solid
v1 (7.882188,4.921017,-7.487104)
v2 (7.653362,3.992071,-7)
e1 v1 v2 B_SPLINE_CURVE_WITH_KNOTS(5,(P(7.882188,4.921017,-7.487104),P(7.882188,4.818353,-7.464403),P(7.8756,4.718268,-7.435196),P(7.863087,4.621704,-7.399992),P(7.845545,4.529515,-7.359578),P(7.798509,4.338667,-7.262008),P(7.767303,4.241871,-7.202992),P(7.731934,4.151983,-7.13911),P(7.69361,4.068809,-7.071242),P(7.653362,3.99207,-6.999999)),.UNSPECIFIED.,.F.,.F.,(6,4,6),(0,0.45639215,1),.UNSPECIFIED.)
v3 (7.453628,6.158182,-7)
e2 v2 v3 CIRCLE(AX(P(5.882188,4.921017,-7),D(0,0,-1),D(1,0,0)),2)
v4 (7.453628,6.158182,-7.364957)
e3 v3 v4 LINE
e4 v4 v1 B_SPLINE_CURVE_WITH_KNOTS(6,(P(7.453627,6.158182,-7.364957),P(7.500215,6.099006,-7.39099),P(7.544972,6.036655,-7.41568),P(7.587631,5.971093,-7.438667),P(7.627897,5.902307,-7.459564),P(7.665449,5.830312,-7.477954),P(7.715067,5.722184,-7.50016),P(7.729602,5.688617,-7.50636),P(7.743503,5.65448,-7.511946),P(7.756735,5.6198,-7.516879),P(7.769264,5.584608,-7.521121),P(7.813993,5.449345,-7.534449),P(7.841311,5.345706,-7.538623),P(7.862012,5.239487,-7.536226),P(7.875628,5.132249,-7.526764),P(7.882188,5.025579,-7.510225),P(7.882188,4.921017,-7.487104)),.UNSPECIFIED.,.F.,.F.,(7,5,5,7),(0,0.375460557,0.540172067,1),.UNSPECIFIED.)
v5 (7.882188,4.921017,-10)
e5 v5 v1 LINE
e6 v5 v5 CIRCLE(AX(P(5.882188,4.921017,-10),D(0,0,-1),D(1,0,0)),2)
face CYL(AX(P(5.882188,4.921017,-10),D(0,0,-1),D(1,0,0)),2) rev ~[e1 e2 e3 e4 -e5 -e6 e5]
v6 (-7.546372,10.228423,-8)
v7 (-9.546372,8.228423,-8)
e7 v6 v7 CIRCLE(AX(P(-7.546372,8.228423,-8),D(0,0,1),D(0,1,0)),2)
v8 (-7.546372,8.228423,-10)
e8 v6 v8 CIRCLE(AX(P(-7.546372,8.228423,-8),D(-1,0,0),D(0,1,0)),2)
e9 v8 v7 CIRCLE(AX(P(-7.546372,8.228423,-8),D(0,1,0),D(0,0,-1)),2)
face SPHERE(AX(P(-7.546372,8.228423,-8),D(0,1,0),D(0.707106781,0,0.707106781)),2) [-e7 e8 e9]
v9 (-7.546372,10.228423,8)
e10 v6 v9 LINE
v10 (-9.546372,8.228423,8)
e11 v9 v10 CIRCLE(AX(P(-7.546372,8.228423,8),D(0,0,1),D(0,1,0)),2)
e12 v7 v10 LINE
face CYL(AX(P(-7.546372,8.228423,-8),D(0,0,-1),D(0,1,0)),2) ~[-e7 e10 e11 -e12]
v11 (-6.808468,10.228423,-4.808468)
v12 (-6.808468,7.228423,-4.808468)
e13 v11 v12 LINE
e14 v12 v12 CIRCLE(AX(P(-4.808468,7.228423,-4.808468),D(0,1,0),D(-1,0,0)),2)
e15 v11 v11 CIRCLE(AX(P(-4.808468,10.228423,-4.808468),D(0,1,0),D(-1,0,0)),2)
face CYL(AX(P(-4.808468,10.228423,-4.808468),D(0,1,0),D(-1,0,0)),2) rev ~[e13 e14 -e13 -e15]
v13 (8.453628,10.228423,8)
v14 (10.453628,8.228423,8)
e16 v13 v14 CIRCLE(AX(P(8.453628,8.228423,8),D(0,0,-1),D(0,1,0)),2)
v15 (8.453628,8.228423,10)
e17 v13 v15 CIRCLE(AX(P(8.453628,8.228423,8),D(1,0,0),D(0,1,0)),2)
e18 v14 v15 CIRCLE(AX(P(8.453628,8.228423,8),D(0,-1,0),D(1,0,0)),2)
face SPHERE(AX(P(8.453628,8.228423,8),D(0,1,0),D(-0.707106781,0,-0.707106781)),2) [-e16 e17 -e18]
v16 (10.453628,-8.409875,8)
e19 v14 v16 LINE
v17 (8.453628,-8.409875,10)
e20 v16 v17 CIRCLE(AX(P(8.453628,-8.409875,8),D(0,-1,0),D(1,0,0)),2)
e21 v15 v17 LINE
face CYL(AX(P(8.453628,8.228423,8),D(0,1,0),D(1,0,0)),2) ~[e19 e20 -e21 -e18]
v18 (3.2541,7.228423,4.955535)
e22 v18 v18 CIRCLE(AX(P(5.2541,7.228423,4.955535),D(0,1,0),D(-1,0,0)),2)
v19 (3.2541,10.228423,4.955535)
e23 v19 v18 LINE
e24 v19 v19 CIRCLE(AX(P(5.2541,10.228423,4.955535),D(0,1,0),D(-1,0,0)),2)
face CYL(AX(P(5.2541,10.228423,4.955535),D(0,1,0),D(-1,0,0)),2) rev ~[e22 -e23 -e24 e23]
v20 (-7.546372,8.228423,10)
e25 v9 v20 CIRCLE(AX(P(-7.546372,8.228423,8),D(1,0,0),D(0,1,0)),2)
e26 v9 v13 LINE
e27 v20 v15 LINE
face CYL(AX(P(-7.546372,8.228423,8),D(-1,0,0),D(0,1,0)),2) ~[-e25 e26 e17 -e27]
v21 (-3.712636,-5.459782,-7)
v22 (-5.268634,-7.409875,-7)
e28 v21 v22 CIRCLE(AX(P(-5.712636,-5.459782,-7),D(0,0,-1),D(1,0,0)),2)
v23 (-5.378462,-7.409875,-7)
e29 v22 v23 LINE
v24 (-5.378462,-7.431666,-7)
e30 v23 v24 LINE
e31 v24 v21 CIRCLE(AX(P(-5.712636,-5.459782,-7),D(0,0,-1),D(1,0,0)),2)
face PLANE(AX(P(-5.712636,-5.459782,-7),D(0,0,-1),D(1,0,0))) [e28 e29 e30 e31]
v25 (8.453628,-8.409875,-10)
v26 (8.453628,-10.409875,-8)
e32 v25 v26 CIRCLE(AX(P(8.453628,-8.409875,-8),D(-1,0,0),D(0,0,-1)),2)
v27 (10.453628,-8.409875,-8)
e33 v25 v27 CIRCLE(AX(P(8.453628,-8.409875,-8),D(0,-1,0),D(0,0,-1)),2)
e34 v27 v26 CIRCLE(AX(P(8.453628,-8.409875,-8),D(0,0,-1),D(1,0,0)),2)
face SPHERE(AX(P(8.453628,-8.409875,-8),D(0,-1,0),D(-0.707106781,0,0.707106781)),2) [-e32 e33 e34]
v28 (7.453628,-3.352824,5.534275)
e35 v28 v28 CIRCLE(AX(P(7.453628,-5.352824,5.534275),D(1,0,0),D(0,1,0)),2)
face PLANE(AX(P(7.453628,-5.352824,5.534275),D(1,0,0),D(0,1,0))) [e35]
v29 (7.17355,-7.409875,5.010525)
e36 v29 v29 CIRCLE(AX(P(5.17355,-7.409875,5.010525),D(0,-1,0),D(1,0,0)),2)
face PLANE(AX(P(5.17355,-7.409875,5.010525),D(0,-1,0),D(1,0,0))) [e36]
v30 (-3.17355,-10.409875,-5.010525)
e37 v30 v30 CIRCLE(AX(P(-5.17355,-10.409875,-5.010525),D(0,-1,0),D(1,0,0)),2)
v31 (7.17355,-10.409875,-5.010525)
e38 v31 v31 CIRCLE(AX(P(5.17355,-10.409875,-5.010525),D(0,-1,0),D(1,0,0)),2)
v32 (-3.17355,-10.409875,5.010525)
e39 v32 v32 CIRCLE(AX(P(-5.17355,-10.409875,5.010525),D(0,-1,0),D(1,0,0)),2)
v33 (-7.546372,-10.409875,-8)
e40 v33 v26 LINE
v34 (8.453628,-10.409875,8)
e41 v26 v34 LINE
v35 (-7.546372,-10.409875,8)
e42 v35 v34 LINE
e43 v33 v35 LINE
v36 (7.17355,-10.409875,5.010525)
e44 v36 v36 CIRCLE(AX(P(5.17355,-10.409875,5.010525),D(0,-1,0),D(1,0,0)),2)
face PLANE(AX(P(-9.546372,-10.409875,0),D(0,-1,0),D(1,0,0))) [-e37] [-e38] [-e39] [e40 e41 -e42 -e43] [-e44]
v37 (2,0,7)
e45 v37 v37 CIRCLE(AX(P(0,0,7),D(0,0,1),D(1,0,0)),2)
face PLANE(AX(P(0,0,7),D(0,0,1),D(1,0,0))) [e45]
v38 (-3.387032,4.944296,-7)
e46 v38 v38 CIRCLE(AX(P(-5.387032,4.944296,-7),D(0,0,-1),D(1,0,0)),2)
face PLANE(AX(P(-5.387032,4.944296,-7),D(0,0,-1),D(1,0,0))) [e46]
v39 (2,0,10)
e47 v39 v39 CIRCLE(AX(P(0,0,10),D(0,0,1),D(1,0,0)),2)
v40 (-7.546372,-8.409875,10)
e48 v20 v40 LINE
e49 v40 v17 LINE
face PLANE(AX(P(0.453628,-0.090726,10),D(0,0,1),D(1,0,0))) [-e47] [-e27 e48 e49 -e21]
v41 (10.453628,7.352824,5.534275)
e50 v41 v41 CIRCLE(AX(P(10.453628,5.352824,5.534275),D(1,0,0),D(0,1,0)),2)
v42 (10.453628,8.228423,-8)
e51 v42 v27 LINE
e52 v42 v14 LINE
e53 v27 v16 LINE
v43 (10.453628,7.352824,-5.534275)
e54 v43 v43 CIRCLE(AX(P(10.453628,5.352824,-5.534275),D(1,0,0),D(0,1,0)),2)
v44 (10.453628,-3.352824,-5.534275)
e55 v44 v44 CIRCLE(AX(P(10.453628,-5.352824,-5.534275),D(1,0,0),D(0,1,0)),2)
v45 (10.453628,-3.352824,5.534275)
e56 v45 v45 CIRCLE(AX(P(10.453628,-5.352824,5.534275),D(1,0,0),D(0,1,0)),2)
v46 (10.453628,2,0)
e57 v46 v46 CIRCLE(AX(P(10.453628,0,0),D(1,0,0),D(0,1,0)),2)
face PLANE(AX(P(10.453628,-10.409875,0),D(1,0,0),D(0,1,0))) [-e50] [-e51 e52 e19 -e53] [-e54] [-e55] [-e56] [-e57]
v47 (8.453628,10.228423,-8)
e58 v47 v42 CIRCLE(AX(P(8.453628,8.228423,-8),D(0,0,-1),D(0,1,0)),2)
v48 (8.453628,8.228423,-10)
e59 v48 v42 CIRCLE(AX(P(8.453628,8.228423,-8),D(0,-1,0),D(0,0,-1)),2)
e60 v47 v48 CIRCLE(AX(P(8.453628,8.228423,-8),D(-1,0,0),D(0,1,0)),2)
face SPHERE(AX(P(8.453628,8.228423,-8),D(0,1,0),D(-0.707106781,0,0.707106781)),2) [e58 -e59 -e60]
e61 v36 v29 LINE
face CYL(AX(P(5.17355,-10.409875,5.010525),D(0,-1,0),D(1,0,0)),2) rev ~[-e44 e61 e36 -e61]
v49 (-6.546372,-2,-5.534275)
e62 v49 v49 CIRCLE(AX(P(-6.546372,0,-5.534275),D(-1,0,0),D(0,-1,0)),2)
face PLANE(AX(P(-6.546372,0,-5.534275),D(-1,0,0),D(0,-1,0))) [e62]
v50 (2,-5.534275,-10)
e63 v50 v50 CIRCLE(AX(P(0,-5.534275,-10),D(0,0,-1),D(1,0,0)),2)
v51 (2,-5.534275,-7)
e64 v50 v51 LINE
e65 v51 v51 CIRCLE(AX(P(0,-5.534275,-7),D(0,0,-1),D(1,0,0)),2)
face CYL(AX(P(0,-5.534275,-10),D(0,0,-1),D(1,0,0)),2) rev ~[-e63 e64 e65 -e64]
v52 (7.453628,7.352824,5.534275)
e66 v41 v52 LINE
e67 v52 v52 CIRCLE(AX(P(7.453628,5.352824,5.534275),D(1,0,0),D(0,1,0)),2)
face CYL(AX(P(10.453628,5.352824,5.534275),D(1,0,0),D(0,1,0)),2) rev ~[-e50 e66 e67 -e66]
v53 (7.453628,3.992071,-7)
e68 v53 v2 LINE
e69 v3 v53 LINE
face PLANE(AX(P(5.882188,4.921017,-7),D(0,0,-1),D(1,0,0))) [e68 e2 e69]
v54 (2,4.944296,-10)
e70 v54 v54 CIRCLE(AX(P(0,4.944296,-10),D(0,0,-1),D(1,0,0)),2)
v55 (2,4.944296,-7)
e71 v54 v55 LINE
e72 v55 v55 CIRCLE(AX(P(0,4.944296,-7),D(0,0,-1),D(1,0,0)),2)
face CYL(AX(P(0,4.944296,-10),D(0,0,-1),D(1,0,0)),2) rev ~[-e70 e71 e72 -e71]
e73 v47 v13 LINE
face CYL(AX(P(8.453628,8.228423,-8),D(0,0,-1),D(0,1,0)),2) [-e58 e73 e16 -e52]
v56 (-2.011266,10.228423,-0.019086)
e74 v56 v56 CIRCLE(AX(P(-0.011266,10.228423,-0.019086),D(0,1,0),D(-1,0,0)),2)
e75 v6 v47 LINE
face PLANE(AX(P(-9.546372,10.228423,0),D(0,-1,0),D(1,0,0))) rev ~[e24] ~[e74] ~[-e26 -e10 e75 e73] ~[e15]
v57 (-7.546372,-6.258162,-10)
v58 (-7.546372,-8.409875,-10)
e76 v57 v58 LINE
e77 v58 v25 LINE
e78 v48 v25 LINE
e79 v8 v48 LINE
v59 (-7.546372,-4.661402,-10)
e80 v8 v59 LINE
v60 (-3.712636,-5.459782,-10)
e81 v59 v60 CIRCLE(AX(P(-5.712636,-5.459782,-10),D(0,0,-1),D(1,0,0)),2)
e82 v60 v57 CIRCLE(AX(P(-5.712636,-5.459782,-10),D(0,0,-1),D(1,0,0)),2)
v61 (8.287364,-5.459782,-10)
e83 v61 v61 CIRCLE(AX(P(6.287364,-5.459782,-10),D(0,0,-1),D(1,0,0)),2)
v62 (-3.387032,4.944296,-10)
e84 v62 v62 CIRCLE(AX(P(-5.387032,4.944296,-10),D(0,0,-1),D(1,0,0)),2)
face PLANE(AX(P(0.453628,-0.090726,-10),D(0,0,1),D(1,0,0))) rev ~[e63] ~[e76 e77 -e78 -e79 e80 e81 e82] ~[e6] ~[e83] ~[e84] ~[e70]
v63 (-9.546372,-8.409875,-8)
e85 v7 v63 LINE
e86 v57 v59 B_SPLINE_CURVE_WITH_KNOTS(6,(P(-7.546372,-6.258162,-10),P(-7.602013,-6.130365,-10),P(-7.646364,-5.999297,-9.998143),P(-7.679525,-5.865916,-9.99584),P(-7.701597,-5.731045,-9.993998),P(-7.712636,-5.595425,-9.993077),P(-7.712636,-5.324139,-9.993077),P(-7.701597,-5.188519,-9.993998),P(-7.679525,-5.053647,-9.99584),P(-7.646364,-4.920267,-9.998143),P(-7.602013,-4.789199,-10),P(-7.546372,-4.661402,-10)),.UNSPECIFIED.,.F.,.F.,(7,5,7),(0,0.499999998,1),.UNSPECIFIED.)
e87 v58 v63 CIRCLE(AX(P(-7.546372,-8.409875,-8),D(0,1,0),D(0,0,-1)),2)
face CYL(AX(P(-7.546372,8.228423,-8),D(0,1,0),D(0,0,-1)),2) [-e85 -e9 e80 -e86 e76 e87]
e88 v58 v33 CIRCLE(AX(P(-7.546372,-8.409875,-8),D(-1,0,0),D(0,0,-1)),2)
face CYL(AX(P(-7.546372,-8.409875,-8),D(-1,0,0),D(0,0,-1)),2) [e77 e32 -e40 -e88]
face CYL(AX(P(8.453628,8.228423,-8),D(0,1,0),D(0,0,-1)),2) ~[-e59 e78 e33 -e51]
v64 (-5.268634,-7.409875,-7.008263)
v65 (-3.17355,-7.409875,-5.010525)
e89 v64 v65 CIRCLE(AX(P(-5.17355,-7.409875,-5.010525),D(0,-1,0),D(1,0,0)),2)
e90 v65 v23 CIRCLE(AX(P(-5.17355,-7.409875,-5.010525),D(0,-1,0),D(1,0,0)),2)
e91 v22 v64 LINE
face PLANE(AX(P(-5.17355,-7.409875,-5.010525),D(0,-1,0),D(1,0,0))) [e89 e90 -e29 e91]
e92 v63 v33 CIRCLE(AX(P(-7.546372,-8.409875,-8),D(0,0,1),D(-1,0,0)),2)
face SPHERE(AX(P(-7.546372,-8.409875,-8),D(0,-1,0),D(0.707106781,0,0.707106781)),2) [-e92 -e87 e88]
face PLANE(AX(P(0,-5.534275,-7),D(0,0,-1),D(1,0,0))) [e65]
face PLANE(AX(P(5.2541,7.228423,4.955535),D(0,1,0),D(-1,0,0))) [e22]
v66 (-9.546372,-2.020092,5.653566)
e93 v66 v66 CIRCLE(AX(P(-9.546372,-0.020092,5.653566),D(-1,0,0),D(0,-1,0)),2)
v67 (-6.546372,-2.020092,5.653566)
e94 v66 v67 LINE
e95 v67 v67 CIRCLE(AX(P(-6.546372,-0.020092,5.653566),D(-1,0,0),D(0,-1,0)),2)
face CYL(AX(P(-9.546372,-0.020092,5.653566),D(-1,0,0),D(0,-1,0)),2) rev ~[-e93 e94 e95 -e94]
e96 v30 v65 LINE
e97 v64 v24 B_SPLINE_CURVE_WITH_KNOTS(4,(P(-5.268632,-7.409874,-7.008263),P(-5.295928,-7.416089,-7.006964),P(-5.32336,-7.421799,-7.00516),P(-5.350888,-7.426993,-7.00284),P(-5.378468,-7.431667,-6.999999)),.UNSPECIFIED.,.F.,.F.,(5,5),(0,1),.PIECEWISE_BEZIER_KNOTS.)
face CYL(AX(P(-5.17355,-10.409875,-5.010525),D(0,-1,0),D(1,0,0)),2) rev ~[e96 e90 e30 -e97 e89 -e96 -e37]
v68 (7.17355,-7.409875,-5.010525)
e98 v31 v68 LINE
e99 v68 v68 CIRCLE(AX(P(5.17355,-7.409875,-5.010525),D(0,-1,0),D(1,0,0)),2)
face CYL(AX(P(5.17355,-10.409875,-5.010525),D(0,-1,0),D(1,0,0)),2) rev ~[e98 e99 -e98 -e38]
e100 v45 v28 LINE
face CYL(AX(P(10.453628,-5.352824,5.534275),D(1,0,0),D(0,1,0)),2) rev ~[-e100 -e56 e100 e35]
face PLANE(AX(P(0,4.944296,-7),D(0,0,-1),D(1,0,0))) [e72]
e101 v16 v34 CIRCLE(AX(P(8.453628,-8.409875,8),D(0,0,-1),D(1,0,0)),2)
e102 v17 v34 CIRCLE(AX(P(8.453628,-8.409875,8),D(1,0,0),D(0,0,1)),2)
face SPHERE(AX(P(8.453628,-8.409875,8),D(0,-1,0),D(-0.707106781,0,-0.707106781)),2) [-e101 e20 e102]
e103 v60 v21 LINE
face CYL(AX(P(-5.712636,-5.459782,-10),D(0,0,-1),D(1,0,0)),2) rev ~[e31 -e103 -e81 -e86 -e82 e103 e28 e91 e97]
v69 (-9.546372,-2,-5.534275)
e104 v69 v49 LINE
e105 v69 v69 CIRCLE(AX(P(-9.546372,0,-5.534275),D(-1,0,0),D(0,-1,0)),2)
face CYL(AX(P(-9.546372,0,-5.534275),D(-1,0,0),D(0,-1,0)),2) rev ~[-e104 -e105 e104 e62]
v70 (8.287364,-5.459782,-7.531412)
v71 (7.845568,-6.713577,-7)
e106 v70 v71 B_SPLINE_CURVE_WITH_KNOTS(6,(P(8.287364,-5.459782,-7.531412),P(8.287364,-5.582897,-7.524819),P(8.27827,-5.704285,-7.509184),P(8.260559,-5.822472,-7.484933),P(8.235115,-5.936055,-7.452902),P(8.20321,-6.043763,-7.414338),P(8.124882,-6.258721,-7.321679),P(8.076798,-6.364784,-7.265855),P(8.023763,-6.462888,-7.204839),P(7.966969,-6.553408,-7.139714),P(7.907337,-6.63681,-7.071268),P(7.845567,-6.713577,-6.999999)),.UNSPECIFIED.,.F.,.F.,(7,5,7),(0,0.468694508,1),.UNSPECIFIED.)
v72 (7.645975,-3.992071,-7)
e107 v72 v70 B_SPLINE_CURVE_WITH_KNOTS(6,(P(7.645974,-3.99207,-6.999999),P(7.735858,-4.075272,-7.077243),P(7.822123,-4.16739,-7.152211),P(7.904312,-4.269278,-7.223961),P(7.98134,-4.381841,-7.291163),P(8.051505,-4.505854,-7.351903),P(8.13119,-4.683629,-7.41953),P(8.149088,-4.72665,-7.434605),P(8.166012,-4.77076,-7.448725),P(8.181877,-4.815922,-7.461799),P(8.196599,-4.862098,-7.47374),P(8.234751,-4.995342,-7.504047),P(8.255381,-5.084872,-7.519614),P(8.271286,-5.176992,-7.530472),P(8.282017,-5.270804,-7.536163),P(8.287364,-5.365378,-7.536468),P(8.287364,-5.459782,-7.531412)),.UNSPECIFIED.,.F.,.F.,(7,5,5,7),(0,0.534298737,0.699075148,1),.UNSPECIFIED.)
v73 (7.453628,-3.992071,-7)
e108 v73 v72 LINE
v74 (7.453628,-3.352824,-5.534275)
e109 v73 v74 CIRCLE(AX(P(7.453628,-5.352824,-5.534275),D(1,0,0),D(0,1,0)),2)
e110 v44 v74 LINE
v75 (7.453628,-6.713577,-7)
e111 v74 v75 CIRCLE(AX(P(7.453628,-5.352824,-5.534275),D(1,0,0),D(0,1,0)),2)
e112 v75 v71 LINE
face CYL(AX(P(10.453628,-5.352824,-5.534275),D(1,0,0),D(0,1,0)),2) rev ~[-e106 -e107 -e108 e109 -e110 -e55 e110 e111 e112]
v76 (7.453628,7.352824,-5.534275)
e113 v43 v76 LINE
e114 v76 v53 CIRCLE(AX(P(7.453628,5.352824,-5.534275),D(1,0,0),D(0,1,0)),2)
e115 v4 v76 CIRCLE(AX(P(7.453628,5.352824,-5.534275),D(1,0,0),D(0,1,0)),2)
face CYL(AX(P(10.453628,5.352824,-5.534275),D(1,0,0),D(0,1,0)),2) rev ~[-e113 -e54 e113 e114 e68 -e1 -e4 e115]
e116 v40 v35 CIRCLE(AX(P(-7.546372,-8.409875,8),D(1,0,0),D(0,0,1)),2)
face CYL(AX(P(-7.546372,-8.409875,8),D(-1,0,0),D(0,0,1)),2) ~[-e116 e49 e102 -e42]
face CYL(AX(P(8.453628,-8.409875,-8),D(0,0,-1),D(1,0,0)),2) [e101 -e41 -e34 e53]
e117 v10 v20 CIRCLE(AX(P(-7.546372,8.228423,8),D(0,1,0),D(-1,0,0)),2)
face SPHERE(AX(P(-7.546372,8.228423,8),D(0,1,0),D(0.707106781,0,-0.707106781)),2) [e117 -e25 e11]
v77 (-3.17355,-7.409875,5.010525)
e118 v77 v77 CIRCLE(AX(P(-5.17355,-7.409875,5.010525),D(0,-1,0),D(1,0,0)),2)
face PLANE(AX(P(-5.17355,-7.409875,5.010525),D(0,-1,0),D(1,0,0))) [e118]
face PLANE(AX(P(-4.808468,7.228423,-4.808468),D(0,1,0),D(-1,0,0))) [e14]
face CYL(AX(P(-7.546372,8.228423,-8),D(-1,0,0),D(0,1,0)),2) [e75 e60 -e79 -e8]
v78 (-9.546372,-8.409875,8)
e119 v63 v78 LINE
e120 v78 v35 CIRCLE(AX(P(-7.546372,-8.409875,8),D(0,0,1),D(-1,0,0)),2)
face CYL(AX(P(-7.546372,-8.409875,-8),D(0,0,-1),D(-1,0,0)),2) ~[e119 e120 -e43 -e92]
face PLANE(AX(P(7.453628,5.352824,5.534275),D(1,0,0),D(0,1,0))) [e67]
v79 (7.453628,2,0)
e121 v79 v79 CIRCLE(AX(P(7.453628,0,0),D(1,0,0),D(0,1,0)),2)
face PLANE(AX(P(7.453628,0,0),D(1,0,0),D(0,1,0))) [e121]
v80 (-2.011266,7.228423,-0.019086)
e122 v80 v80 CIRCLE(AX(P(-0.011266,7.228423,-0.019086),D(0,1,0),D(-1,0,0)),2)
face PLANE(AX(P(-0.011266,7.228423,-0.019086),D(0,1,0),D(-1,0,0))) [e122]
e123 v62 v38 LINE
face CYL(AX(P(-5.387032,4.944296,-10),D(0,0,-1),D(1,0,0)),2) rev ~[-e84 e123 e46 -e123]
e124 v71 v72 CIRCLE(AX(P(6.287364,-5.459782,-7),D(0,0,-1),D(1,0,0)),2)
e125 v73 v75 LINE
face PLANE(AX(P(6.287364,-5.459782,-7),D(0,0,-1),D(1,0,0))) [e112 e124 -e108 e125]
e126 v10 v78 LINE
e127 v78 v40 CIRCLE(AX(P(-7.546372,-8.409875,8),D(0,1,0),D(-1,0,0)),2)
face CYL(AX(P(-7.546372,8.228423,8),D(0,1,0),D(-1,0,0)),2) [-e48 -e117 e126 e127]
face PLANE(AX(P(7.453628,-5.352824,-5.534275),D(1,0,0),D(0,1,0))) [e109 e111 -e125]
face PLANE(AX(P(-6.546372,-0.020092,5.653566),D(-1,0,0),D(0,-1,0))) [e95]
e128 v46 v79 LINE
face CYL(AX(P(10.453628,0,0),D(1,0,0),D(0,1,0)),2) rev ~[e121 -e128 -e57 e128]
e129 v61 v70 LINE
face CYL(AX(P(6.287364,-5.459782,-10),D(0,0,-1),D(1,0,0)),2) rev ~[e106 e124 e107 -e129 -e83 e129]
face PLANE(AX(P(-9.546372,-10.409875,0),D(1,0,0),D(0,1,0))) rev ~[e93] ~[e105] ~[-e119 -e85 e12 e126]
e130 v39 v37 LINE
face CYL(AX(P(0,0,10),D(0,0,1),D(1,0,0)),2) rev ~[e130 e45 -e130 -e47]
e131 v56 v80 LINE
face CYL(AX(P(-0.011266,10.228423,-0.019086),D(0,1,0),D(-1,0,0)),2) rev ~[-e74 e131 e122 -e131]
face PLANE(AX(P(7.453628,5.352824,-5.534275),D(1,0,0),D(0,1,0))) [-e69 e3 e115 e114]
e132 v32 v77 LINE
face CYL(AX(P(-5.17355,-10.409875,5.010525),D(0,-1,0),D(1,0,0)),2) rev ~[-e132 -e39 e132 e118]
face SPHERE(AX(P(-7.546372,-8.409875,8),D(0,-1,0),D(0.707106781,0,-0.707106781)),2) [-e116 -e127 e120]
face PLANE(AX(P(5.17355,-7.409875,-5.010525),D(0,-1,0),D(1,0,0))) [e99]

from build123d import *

# Parameters (mm, degrees)
F0_W          = 20
F0_H          = 20.6382983719
F1_DEPTH      = 10
F2_R          = 2
F3_DEPTH      = 3
F4_R          = 2
F5_DEPTH      = 3
F6_R          = 2
F7_DEPTH      = 3
F8_R          = 2
F9_DEPTH      = 3
F10_R         = 2
F11_DEPTH     = 3
F12_R         = 2
F13_DEPTH     = 3
F14_T1_DEPTH  = 16
F14_T3_DEPTH  = 16
F14_T5_DEPTH  = 16.6382983719
F14_S9_W      = 2
F14_S9_H      = 2
F14_T10_DEPTH = 2
F14_S15_W     = 2
F14_S15_H     = 2
F14_T16_DEPTH = 2
F14_S21_W     = 2
F14_S21_H     = 2
F14_T22_DEPTH = 2
F14_S27_W     = 2
F14_S27_H     = 2
F14_T28_DEPTH = 2
F14_S33_W     = 2
F14_S33_H     = 2
F14_T34_DEPTH = 2
F14_S39_W     = 2
F14_S39_H     = 2
F14_T40_DEPTH = 2
F14_S45_W     = 2
F14_S45_H     = 2
F14_T46_DEPTH = 2
F14_S51_W     = 2
F14_S51_H     = 2
F14_T52_DEPTH = 2


# Not quite as in the source:
# - a fillet or chamfer that OpenCascade refuses, or shapes differently, is made with other operations: its cross-section is extruded or revolved along the edge and cut away or added


with BuildPart() as f1:
    # F0 (on Top) → F1 (new body, symmetric)
    with BuildSketch(Plane.XY):
        with Locations((0.4536276683, -0.0907257199)):
            Rectangle(F0_W, F0_H)
    extrude(amount=F1_DEPTH, both=True)

    # F2 (on face) → F3 (cut)
    with BuildSketch(Plane.XY.offset(10)):
        Circle(F2_R)
    extrude(amount=-F3_DEPTH, mode=Mode.SUBTRACT)

    # F4 (on face) → F5 (cut)
    with BuildSketch(Plane(origin=(0, 0, -10), x_dir=(1, 0, 0), z_dir=(0, 0, -1))):
        with Locations((-5.7126359213, 5.4597818985)):
            Circle(F4_R)
        with Locations((0, 5.5342745036)):
            Circle(F4_R)
        with Locations((6.2873640787, 5.4597818985)):
            Circle(F4_R)
        with Locations((-5.3870321827, -4.9442961443)):
            Circle(F4_R)
        with Locations((0, -4.9442961443)):
            Circle(F4_R)
        with Locations((5.8821875854, -4.9210169871)):
            Circle(F4_R)
    extrude(amount=-F5_DEPTH, mode=Mode.SUBTRACT)

    # F6 (on face) → F7 (cut)
    with BuildSketch(Plane(origin=(-9.5463723317, 0, 0), x_dir=(0, -1, 0), z_dir=(-1, 0, 0))):
        with Locations((0.0200922749, 5.65356597)):
            Circle(F6_R)
        with Locations((0, -5.5342745036)):
            Circle(F6_R)
    extrude(amount=-F7_DEPTH, mode=Mode.SUBTRACT)

    # F8 (on face) → F9 (cut)
    with BuildSketch(Plane.YZ.offset(10.4536276683)):
        Circle(F8_R)
        with Locations((-5.3528235294, 5.5342745036)):
            Circle(F8_R)
        with Locations((5.3528235294, 5.5342745036)):
            Circle(F8_R)
        with Locations((-5.3528235294, -5.5342745036)):
            Circle(F8_R)
        with Locations((5.3528235294, -5.5342745036)):
            Circle(F8_R)
    extrude(amount=-F9_DEPTH, mode=Mode.SUBTRACT)

    # F10 (on face) → F11 (cut)
    with BuildSketch(Plane(origin=(0, 10.228423466, 0), x_dir=(-1, 0, 0), z_dir=(0, 1, 0))):
        with Locations((0.0112662294, -0.0190863853)):
            Circle(F10_R)
        with Locations((4.8084682785, -4.8084678128)):
            Circle(F10_R)
        with Locations((-5.254099916, 4.9555348842)):
            Circle(F10_R)
    extrude(amount=-F11_DEPTH, mode=Mode.SUBTRACT)

    # F12 (on face) → F13 (cut)
    with BuildSketch(Plane.XZ.offset(10.4098749059)):
        with Locations((5.1735501704, 5.0105248782)):
            Circle(F12_R)
        with Locations((-5.1735501704, 5.0105248782)):
            Circle(F12_R)
        with Locations((-5.1735501704, -5.0105248782)):
            Circle(F12_R)
        with Locations((5.1735501704, -5.0105248782)):
            Circle(F12_R)
    extrude(amount=-F13_DEPTH, mode=Mode.SUBTRACT)

    # F14: fillet of radius 2 on 12 edges, made by hand

    # F14_s2 → F14_t1 (cut)
    with BuildSketch(Plane.XY.offset(-8)):
        with BuildLine():
            ThreePointArc((10.4536276683, -8.4098749059), (9.8678412307, -9.8240884682), (8.4536276683, -10.4098749059))
            Line((8.4536276683, -10.4098749059), (10.4536276683, -10.4098749059))
            Line((10.4536276683, -10.4098749059), (10.4536276683, -8.4098749059))
        make_face()
        with BuildLine():
            ThreePointArc((-9.5463723317, -8.4098749059), (-8.9605858941, -9.8240884682), (-7.5463723317, -10.4098749059))
            Line((-7.5463723317, -10.4098749059), (-9.5463723317, -10.4098749059))
            Line((-9.5463723317, -10.4098749059), (-9.5463723317, -8.4098749059))
        make_face()
        with BuildLine():
            ThreePointArc((-7.5463723317, 10.228423466), (-8.9605858941, 9.6426370284), (-9.5463723317, 8.228423466))
            Line((-9.5463723317, 8.228423466), (-9.5463723317, 10.228423466))
            Line((-9.5463723317, 10.228423466), (-7.5463723317, 10.228423466))
        make_face()
        with BuildLine():
            ThreePointArc((8.4536276683, 10.228423466), (9.8678412307, 9.6426370284), (10.4536276683, 8.228423466))
            Line((10.4536276683, 8.228423466), (10.4536276683, 10.228423466))
            Line((10.4536276683, 10.228423466), (8.4536276683, 10.228423466))
        make_face()
    extrude(amount=F14_T1_DEPTH, mode=Mode.SUBTRACT)

    # F14_s4 → F14_t3 (cut)
    with BuildSketch(Plane.YZ.offset(-7.5463723317)):
        with BuildLine():
            ThreePointArc((-8.4098749059, 10), (-9.8240884682, 9.4142135624), (-10.4098749059, 8))
            Line((-10.4098749059, 8), (-10.4098749059, 10))
            Line((-10.4098749059, 10), (-8.4098749059, 10))
        make_face()
        with BuildLine():
            ThreePointArc((-8.4098749059, -10), (-9.8240884682, -9.4142135624), (-10.4098749059, -8))
            Line((-10.4098749059, -8), (-10.4098749059, -10))
            Line((-10.4098749059, -10), (-8.4098749059, -10))
        make_face()
        with BuildLine():
            ThreePointArc((10.228423466, -8), (9.6426370284, -9.4142135624), (8.228423466, -10))
            Line((8.228423466, -10), (10.228423466, -10))
            Line((10.228423466, -10), (10.228423466, -8))
        make_face()
        with BuildLine():
            ThreePointArc((10.228423466, 8), (9.6426370284, 9.4142135624), (8.228423466, 10))
            Line((8.228423466, 10), (10.228423466, 10))
            Line((10.228423466, 10), (10.228423466, 8))
        make_face()
    extrude(amount=F14_T3_DEPTH, mode=Mode.SUBTRACT)

    # F14_s6 → F14_t5 (cut)
    with BuildSketch(Plane.XZ.offset(-8.228423466)):
        with BuildLine():
            ThreePointArc((-9.5463723317, 8), (-8.9605858941, 9.4142135624), (-7.5463723317, 10))
            Line((-7.5463723317, 10), (-9.5463723317, 10))
            Line((-9.5463723317, 10), (-9.5463723317, 8))
        make_face()
        with BuildLine():
            ThreePointArc((-7.5463723317, -10), (-8.9605858941, -9.4142135624), (-9.5463723317, -8))
            Line((-9.5463723317, -8), (-9.5463723317, -10))
            Line((-9.5463723317, -10), (-7.5463723317, -10))
        make_face()
        with BuildLine():
            ThreePointArc((8.4536276683, -10), (9.8678412307, -9.4142135624), (10.4536276683, -8))
            Line((10.4536276683, -8), (10.4536276683, -10))
            Line((10.4536276683, -10), (8.4536276683, -10))
        make_face()
        with BuildLine():
            ThreePointArc((10.4536276683, 8), (9.8678412307, 9.4142135624), (8.4536276683, 10))
            Line((8.4536276683, 10), (10.4536276683, 10))
            Line((10.4536276683, 10), (10.4536276683, 8))
        make_face()
    extrude(amount=F14_T5_DEPTH, mode=Mode.SUBTRACT)


with BuildPart() as f14_tool8:
    # F14_s9 → F14_t10 (new body)
    with BuildSketch(Plane.XZ.offset(8.4098749059)):
        with Locations((9.4536276683, 9)):
            Rectangle(F14_S9_W, F14_S9_H)
    extrude(amount=F14_T10_DEPTH)

    # F14_s11 → F14_t12 (revolve, cut)
    with BuildSketch(Plane(origin=(8.4536276683, -8.4098749059, 8), x_dir=(-0.7071067812, 0, -0.7071067812), z_dir=(-0.7071067812, 0, 0.7071067812))):
        with BuildLine():
            ThreePointArc((0, -2), (2, 0), (0, 2))
            Line((0, 2), (0, -2))
        make_face()
    revolve(axis=Axis((8.4536276683, -8.4098749059, 8), (0, -1, 0)), mode=Mode.SUBTRACT)


with BuildPart() as f1_1:
    add(f1.part)

    # F14_t7: cut F14_tool8
    add(f14_tool8.part, mode=Mode.SUBTRACT)


with BuildPart() as f14_tool14:
    # F14_s15 → F14_t16 (new body)
    with BuildSketch(Plane.XZ.offset(8.4098749059)):
        with Locations((9.4536276683, -9)):
            Rectangle(F14_S15_W, F14_S15_H)
    extrude(amount=F14_T16_DEPTH)

    # F14_s17 → F14_t18 (revolve, cut)
    with BuildSketch(Plane(origin=(8.4536276683, -8.4098749059, -8), x_dir=(-0.7071067812, 0, 0.7071067812), z_dir=(0.7071067812, 0, 0.7071067812))):
        with BuildLine():
            ThreePointArc((0, -2), (2, 0), (0, 2))
            Line((0, 2), (0, -2))
        make_face()
    revolve(axis=Axis((8.4536276683, -8.4098749059, -8), (0, -1, 0)), mode=Mode.SUBTRACT)


with BuildPart() as f1_2:
    add(f1_1.part)

    # F14_t13: cut F14_tool14
    add(f14_tool14.part, mode=Mode.SUBTRACT)


with BuildPart() as f14_tool20:
    # F14_s21 → F14_t22 (new body)
    with BuildSketch(Plane.XZ.offset(8.4098749059)):
        with Locations((-8.5463723317, 9)):
            Rectangle(F14_S21_W, F14_S21_H)
    extrude(amount=F14_T22_DEPTH)

    # F14_s23 → F14_t24 (revolve, cut)
    with BuildSketch(Plane(origin=(-7.5463723317, -8.4098749059, 8), x_dir=(0.7071067812, 0, -0.7071067812), z_dir=(-0.7071067812, 0, -0.7071067812))):
        with BuildLine():
            ThreePointArc((0, -2), (2, 0), (0, 2))
            Line((0, 2), (0, -2))
        make_face()
    revolve(axis=Axis((-7.5463723317, -8.4098749059, 8), (0, -1, 0)), mode=Mode.SUBTRACT)


with BuildPart() as f1_3:
    add(f1_2.part)

    # F14_t19: cut F14_tool20
    add(f14_tool20.part, mode=Mode.SUBTRACT)


with BuildPart() as f14_tool26:
    # F14_s27 → F14_t28 (new body)
    with BuildSketch(Plane.XZ.offset(8.4098749059)):
        with Locations((-8.5463723317, -9)):
            Rectangle(F14_S27_W, F14_S27_H)
    extrude(amount=F14_T28_DEPTH)

    # F14_s29 → F14_t30 (revolve, cut)
    with BuildSketch(Plane(origin=(-7.5463723317, -8.4098749059, -8), x_dir=(0.7071067812, 0, 0.7071067812), z_dir=(0.7071067812, 0, -0.7071067812))):
        with BuildLine():
            ThreePointArc((0, -2), (2, 0), (0, 2))
            Line((0, 2), (0, -2))
        make_face()
    revolve(axis=Axis((-7.5463723317, -8.4098749059, -8), (0, -1, 0)), mode=Mode.SUBTRACT)


with BuildPart() as f1_4:
    add(f1_3.part)

    # F14_t25: cut F14_tool26
    add(f14_tool26.part, mode=Mode.SUBTRACT)


with BuildPart() as f14_tool32:
    # F14_s33 → F14_t34 (new body)
    with BuildSketch(Plane.XZ.offset(-8.228423466)):
        with Locations((-8.5463723317, 9)):
            Rectangle(F14_S33_W, F14_S33_H)
    extrude(amount=-F14_T34_DEPTH)

    # F14_s35 → F14_t36 (revolve, cut)
    with BuildSketch(Plane(origin=(-7.5463723317, 8.228423466, 8), x_dir=(0.7071067812, 0, -0.7071067812), z_dir=(0.7071067812, 0, 0.7071067812))):
        with BuildLine():
            ThreePointArc((0, -2), (2, 0), (0, 2))
            Line((0, 2), (0, -2))
        make_face()
    revolve(axis=Axis((-7.5463723317, 8.228423466, 8), (0, 1, 0)), mode=Mode.SUBTRACT)


with BuildPart() as f1_5:
    add(f1_4.part)

    # F14_t31: cut F14_tool32
    add(f14_tool32.part, mode=Mode.SUBTRACT)


with BuildPart() as f14_tool38:
    # F14_s39 → F14_t40 (new body)
    with BuildSketch(Plane.XZ.offset(-8.228423466)):
        with Locations((-8.5463723317, -9)):
            Rectangle(F14_S39_W, F14_S39_H)
    extrude(amount=-F14_T40_DEPTH)

    # F14_s41 → F14_t42 (revolve, cut)
    with BuildSketch(Plane(origin=(-7.5463723317, 8.228423466, -8), x_dir=(0.7071067812, 0, 0.7071067812), z_dir=(-0.7071067812, 0, 0.7071067812))):
        with BuildLine():
            ThreePointArc((0, -2), (2, 0), (0, 2))
            Line((0, 2), (0, -2))
        make_face()
    revolve(axis=Axis((-7.5463723317, 8.228423466, -8), (0, 1, 0)), mode=Mode.SUBTRACT)


with BuildPart() as f1_6:
    add(f1_5.part)

    # F14_t37: cut F14_tool38
    add(f14_tool38.part, mode=Mode.SUBTRACT)


with BuildPart() as f14_tool44:
    # F14_s45 → F14_t46 (new body)
    with BuildSketch(Plane.XZ.offset(-8.228423466)):
        with Locations((9.4536276683, -9)):
            Rectangle(F14_S45_W, F14_S45_H)
    extrude(amount=-F14_T46_DEPTH)

    # F14_s47 → F14_t48 (revolve, cut)
    with BuildSketch(Plane(origin=(8.4536276683, 8.228423466, -8), x_dir=(-0.7071067812, 0, 0.7071067812), z_dir=(-0.7071067812, 0, -0.7071067812))):
        with BuildLine():
            ThreePointArc((0, -2), (2, 0), (0, 2))
            Line((0, 2), (0, -2))
        make_face()
    revolve(axis=Axis((8.4536276683, 8.228423466, -8), (0, 1, 0)), mode=Mode.SUBTRACT)


with BuildPart() as f1_7:
    add(f1_6.part)

    # F14_t43: cut F14_tool44
    add(f14_tool44.part, mode=Mode.SUBTRACT)


with BuildPart() as f14_tool50:
    # F14_s51 → F14_t52 (new body)
    with BuildSketch(Plane.XZ.offset(-8.228423466)):
        with Locations((9.4536276683, 9)):
            Rectangle(F14_S51_W, F14_S51_H)
    extrude(amount=-F14_T52_DEPTH)

    # F14_s53 → F14_t54 (revolve, cut)
    with BuildSketch(Plane(origin=(8.4536276683, 8.228423466, 8), x_dir=(-0.7071067812, 0, -0.7071067812), z_dir=(0.7071067812, 0, -0.7071067812))):
        with BuildLine():
            ThreePointArc((0, -2), (2, 0), (0, 2))
            Line((0, 2), (0, -2))
        make_face()
    revolve(axis=Axis((8.4536276683, 8.228423466, 8), (0, 1, 0)), mode=Mode.SUBTRACT)


with BuildPart() as f1_8:
    add(f1_7.part)

    # F14_t49: cut F14_tool50
    add(f14_tool50.part, mode=Mode.SUBTRACT)


solid = f1_8.part
